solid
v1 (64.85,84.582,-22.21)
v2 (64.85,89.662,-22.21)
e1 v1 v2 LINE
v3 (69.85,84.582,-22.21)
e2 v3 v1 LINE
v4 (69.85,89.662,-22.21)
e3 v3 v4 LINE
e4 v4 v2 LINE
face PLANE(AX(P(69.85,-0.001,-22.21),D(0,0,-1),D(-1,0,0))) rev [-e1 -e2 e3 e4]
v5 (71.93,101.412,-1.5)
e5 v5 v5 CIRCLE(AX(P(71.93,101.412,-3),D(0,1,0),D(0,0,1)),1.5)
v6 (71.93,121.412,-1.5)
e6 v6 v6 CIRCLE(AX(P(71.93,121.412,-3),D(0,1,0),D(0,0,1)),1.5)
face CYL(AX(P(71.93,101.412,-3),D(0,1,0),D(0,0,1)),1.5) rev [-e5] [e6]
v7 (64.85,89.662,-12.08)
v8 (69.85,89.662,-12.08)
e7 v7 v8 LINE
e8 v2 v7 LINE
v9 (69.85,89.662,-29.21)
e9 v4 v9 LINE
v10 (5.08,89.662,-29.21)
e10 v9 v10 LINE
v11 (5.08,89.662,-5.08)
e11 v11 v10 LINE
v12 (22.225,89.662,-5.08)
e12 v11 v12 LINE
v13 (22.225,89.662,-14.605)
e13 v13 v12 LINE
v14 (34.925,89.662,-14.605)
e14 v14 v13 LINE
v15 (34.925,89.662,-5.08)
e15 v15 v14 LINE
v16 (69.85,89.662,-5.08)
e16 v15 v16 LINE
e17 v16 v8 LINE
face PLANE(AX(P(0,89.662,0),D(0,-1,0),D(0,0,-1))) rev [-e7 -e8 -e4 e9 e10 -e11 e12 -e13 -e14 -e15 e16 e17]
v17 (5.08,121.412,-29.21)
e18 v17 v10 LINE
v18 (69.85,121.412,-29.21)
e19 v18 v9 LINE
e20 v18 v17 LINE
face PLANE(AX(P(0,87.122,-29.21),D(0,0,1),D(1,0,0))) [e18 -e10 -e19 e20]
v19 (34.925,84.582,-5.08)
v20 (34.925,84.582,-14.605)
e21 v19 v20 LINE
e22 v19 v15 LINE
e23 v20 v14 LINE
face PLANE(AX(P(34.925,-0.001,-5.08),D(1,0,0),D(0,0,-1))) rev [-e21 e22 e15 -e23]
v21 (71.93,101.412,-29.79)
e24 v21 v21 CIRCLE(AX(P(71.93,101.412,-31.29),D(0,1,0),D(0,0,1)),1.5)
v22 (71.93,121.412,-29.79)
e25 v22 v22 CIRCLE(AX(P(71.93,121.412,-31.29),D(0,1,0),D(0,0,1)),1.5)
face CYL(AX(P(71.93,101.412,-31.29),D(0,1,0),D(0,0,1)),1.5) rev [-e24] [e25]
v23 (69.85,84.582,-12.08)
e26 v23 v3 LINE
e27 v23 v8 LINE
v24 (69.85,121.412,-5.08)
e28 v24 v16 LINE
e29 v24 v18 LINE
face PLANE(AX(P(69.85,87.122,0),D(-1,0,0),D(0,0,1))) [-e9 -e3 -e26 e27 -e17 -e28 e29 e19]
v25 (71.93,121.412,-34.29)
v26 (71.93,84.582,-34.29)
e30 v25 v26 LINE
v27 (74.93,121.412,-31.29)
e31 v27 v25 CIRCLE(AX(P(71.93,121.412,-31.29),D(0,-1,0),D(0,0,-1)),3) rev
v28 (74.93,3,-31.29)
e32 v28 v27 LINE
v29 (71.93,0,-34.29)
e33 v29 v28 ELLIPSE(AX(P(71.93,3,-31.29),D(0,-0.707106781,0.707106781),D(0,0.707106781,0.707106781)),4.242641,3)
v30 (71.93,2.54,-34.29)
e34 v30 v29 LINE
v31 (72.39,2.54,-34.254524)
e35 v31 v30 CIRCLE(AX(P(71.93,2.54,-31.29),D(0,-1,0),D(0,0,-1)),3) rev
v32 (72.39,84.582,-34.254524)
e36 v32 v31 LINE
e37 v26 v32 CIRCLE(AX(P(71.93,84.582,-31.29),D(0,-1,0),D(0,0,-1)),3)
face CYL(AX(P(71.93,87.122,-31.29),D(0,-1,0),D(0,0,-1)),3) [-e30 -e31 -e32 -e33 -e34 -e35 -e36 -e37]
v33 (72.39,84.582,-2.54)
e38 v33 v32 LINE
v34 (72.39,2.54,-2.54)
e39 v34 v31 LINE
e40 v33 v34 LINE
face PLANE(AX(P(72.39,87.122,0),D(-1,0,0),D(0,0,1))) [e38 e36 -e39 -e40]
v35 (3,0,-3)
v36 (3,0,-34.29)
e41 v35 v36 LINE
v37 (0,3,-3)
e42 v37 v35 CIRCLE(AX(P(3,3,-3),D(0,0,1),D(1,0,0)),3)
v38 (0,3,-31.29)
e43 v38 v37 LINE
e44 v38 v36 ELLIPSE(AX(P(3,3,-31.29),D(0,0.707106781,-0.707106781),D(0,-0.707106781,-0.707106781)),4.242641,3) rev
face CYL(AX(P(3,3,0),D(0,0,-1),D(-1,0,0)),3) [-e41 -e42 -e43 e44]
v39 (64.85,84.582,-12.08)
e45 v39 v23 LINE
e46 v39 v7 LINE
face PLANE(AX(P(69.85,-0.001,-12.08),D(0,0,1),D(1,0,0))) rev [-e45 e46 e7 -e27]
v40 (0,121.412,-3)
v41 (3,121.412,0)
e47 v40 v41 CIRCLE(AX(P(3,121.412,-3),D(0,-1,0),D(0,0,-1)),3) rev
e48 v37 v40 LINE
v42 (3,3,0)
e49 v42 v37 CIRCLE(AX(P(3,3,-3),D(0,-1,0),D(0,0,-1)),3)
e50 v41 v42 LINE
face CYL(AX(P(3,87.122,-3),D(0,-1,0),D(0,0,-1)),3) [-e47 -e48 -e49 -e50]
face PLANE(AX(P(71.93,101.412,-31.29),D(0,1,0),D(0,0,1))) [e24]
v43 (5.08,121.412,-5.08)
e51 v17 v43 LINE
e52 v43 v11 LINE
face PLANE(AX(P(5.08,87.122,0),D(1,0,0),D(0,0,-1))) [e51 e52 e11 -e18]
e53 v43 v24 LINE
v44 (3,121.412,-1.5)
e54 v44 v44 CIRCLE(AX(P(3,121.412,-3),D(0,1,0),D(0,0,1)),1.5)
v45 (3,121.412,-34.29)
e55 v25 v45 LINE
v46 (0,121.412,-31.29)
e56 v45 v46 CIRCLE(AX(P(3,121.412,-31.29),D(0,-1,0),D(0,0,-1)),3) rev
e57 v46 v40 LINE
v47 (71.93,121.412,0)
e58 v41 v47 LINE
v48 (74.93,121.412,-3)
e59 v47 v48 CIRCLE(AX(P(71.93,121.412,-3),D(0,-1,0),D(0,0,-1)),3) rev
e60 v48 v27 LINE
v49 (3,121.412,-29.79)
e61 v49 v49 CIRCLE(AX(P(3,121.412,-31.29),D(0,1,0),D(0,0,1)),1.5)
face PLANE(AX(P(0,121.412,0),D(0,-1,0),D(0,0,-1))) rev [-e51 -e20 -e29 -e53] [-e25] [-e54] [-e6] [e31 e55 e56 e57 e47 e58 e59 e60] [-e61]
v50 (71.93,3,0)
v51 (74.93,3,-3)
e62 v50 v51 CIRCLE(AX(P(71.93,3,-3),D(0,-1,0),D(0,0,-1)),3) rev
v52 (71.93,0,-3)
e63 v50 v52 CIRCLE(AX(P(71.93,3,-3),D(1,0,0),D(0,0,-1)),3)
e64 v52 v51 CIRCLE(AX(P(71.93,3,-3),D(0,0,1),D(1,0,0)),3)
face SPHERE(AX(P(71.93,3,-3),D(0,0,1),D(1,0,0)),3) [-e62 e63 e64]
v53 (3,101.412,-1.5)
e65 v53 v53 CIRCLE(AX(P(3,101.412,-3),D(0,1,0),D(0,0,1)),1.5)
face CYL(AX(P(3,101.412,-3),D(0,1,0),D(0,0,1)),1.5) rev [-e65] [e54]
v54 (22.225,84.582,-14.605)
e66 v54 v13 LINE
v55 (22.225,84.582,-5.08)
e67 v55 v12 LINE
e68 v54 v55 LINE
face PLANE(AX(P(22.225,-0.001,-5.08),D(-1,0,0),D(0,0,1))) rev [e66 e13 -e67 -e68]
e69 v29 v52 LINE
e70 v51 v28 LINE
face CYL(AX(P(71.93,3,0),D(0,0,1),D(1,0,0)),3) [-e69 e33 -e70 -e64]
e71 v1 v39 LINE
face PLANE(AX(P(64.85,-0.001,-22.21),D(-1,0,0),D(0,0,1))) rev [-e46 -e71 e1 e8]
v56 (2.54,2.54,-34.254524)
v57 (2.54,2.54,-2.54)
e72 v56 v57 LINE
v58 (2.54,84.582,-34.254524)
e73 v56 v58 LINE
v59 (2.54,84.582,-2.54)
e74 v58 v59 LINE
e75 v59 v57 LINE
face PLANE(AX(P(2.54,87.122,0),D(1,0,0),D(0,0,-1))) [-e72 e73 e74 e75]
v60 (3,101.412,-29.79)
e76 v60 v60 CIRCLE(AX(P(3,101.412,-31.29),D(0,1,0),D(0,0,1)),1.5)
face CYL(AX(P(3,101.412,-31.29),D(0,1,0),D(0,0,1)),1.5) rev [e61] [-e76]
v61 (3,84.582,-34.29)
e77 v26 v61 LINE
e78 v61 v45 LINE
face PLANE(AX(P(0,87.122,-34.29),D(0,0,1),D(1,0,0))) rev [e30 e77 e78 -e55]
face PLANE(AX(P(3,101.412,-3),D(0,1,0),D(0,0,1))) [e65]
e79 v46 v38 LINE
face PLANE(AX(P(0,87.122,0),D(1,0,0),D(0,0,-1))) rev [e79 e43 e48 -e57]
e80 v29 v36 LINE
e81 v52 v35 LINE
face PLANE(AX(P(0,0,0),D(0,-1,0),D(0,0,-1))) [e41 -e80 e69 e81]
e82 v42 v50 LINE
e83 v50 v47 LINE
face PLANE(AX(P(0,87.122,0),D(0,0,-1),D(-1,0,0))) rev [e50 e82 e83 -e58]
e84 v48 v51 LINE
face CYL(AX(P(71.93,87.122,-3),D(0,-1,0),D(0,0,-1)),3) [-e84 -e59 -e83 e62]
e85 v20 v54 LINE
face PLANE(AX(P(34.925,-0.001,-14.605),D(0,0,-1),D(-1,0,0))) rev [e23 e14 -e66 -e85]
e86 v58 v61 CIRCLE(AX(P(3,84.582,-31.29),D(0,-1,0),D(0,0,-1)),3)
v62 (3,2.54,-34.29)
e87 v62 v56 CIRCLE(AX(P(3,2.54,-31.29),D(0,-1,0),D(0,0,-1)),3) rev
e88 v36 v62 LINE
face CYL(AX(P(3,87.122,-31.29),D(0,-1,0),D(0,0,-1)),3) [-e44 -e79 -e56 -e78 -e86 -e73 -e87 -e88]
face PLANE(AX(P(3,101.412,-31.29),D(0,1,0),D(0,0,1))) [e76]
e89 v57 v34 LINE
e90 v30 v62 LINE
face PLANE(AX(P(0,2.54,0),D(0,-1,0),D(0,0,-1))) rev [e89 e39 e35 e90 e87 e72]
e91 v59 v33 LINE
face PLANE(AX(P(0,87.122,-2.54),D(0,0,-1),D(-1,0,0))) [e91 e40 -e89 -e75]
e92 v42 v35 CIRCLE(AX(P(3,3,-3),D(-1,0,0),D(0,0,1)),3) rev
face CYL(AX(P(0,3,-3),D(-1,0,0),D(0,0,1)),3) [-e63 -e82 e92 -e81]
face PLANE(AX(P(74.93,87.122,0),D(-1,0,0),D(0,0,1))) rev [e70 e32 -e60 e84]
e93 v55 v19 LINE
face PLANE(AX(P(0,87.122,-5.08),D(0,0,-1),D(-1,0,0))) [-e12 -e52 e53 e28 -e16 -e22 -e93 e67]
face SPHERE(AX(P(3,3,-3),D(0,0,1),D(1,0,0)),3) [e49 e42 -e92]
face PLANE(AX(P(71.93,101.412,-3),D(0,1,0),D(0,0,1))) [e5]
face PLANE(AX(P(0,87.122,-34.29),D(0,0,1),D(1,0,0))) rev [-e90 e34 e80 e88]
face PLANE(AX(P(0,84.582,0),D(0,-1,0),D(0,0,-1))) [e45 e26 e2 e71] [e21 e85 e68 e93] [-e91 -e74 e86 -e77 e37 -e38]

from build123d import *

# Parameters (mm, degrees)
SKETCH1_W           = 74.93
SKETCH1_H           = 34.29
BOSS_EXTRUDE1_DEPTH = 87.122
SHELL1_T            = -2.54
SKETCH12_W          = 74.93
SKETCH12_H          = 34.29
BOSS_EXTRUDE6_DEPTH = 34.29
SHELL2_T            = -5.08
CUT_EXTRUDE13_REACH = 123.777
SKETCH18_W          = 12.7
SKETCH18_H          = 9.525
SKETCH18_W_2        = 5
SKETCH18_H_2        = 10.13
SKETCH20_R          = 1.5
CUT_EXTRUDE14_DEPTH = 20
FILLET1_R           = 3


with BuildPart() as part:
    # Sketch1 → Boss-Extrude1 (new body)
    with BuildSketch(Plane(origin=(0, 0, 0), x_dir=(1, 0, 0), z_dir=(0, 1, 0))):
        with Locations((37.465, 17.145)):
            Rectangle(SKETCH1_W, SKETCH1_H)
    extrude(amount=BOSS_EXTRUDE1_DEPTH)

    # Shell1
    shell1_openings = [part.faces().sort_by_distance(p)[0] for p in [
        (37.465, 43.561, -34.29),
    ]]
    offset(amount=SHELL1_T, openings=shell1_openings, kind=Kind.INTERSECTION)

    # Sketch12 → Boss-Extrude6 (add)
    with BuildSketch(Plane(origin=(0, 87.122, 0), x_dir=(1, 0, 0), z_dir=(0, 1, 0))):
        with Locations((37.465, 17.145)):
            Rectangle(SKETCH12_W, SKETCH12_H)
    extrude(amount=BOSS_EXTRUDE6_DEPTH)

    # Shell2
    shell2_openings = [part.faces().sort_by_distance(p)[0] for p in [
        (37.465, 121.412, -17.145),
    ]]
    offset(amount=SHELL2_T, openings=shell2_openings)

    # Sketch18 → Cut-Extrude13 (cut, up to next)
    with BuildSketch(Plane(origin=(0, 89.662, 0), x_dir=(1, 0, 0), z_dir=(0, 1, 0)), mode=Mode.PRIVATE) as cut_extrude13_sk1:
        with Locations((28.575, 9.8425)):
            Rectangle(SKETCH18_W, SKETCH18_H)
    cut_extrude13_tool1 = extrude(cut_extrude13_sk1.sketch, amount=-CUT_EXTRUDE13_REACH, mode=Mode.PRIVATE) & part.part
    # Sketch18 → Cut-Extrude13 (cut, up to next)
    with BuildSketch(Plane(origin=(0, 89.662, 0), x_dir=(1, 0, 0), z_dir=(0, 1, 0)), mode=Mode.PRIVATE) as cut_extrude13_sk2:
        with Locations((67.35, 17.145)):
            Rectangle(SKETCH18_W_2, SKETCH18_H_2)
    cut_extrude13_tool2 = extrude(cut_extrude13_sk2.sketch, amount=-CUT_EXTRUDE13_REACH, mode=Mode.PRIVATE) & part.part
    add(cut_extrude13_tool1.solids().sort_by_distance((28.575, 89.662, -9.8425))[0], mode=Mode.SUBTRACT)
    add(cut_extrude13_tool2.solids().sort_by_distance((67.35, 89.662, -17.145))[0], mode=Mode.SUBTRACT)

    # Sketch20 → Cut-Extrude14 (cut)
    with BuildSketch(Plane(origin=(0, 121.412, 0), x_dir=(1, 0, 0), z_dir=(0, 1, 0))):
        with Locations(Location((3, 31.29, 0), (0, 0, 270))):
            Circle(SKETCH20_R)
        with Locations(Location((3, 3, 0), (0, 0, 270))):
            Circle(SKETCH20_R)
        with Locations(Location((71.93, 3, 0), (0, 0, 270))):
            Circle(SKETCH20_R)
        with Locations(Location((71.93, 31.29, 0), (0, 0, 270))):
            Circle(SKETCH20_R)
    extrude(amount=-CUT_EXTRUDE14_DEPTH, mode=Mode.SUBTRACT)

    # Fillet1
    # the kernel refuses this fillet: 3 mm, written as the material it takes off along each edge
    with BuildSketch(Plane(origin=(71.93, 3, -3), x_dir=(1, 0, 0), z_dir=(0, 0, 1))) as fillet1_piece_1_section:
        Polygon((0, 0), (FILLET1_R, 0), (FILLET1_R, -FILLET1_R), (0, -FILLET1_R), align=None)
    fillet1_piece_1 = extrude(amount=FILLET1_R, mode=Mode.PRIVATE)
    fillet1_piece_1 = fillet1_piece_1 - Plane(origin=(71.93, 3, -3), x_dir=(-0.7071067811865475, 0.7071067811865475, 0), z_dir=(0, 0, 1)) * Sphere(FILLET1_R, mode=Mode.PRIVATE)
    add(fillet1_piece_1, mode=Mode.SUBTRACT)
    with BuildSketch(Plane(origin=(3, 3, -3), x_dir=(-1, 0, 0), z_dir=(0, 0, 1))) as fillet1_piece_2_section:
        Polygon((0, 0), (FILLET1_R, 0), (FILLET1_R, FILLET1_R), (0, FILLET1_R), align=None)
    fillet1_piece_2 = extrude(amount=FILLET1_R, mode=Mode.PRIVATE)
    fillet1_piece_2 = fillet1_piece_2 - Plane(origin=(3, 3, -3), x_dir=(0.7071067811865475, 0.7071067811865475, 0), z_dir=(0, 0, 1)) * Sphere(FILLET1_R, mode=Mode.PRIVATE)
    add(fillet1_piece_2, mode=Mode.SUBTRACT)
    with BuildSketch(Plane(origin=(74.93, 0, -3), x_dir=(0, 1, 0), z_dir=(0, 0, -1)), Plane(origin=(0, 0, -41.79), x_dir=(0, 1, 0), z_dir=(0, 0, 1))) as fillet1_piece_3:
        with BuildLine():
            CenterArc((FILLET1_R, -FILLET1_R), FILLET1_R, 90, 90)
            Line((0, -FILLET1_R), (0, 0))
            Line((0, 0), (FILLET1_R, 0))
        make_face()
    extrude(amount=38.79, mode=Mode.SUBTRACT)
    with BuildSketch(Plane(origin=(3, 0, 0), x_dir=(0, 1, 0), z_dir=(1, 0, 0))) as fillet1_piece_4:
        with BuildLine():
            CenterArc((FILLET1_R, -FILLET1_R), FILLET1_R, 90, 90)
            Line((0, -FILLET1_R), (0, 0))
            Line((0, 0), (FILLET1_R, 0))
        make_face()
    extrude(amount=68.93, mode=Mode.SUBTRACT)
    with BuildSketch(Plane(origin=(74.93, -7.5, -34.29), x_dir=(0, 0, 1), z_dir=(0, 1, 0)), Plane(origin=(0, 128.912, -34.29), x_dir=(0, 0, 1), z_dir=(0, -1, 0))) as fillet1_piece_5:
        with BuildLine():
            CenterArc((FILLET1_R, -FILLET1_R), FILLET1_R, 90, 90)
            Line((0, -FILLET1_R), (0, 0))
            Line((0, 0), (FILLET1_R, 0))
        make_face()
    extrude(amount=136.412, mode=Mode.SUBTRACT)
    with BuildSketch(Plane(origin=(74.93, 3, 0), x_dir=(-1, 0, 0), z_dir=(0, 1, 0)), Plane(origin=(0, 128.912, 0), x_dir=(1, 0, 0), z_dir=(0, -1, 0))) as fillet1_piece_6:
        with BuildLine():
            CenterArc((FILLET1_R, -FILLET1_R), FILLET1_R, 90, 90)
            Line((0, -FILLET1_R), (0, 0))
            Line((0, 0), (FILLET1_R, 0))
        make_face()
    extrude(amount=125.912, mode=Mode.SUBTRACT)


solid = part.part
